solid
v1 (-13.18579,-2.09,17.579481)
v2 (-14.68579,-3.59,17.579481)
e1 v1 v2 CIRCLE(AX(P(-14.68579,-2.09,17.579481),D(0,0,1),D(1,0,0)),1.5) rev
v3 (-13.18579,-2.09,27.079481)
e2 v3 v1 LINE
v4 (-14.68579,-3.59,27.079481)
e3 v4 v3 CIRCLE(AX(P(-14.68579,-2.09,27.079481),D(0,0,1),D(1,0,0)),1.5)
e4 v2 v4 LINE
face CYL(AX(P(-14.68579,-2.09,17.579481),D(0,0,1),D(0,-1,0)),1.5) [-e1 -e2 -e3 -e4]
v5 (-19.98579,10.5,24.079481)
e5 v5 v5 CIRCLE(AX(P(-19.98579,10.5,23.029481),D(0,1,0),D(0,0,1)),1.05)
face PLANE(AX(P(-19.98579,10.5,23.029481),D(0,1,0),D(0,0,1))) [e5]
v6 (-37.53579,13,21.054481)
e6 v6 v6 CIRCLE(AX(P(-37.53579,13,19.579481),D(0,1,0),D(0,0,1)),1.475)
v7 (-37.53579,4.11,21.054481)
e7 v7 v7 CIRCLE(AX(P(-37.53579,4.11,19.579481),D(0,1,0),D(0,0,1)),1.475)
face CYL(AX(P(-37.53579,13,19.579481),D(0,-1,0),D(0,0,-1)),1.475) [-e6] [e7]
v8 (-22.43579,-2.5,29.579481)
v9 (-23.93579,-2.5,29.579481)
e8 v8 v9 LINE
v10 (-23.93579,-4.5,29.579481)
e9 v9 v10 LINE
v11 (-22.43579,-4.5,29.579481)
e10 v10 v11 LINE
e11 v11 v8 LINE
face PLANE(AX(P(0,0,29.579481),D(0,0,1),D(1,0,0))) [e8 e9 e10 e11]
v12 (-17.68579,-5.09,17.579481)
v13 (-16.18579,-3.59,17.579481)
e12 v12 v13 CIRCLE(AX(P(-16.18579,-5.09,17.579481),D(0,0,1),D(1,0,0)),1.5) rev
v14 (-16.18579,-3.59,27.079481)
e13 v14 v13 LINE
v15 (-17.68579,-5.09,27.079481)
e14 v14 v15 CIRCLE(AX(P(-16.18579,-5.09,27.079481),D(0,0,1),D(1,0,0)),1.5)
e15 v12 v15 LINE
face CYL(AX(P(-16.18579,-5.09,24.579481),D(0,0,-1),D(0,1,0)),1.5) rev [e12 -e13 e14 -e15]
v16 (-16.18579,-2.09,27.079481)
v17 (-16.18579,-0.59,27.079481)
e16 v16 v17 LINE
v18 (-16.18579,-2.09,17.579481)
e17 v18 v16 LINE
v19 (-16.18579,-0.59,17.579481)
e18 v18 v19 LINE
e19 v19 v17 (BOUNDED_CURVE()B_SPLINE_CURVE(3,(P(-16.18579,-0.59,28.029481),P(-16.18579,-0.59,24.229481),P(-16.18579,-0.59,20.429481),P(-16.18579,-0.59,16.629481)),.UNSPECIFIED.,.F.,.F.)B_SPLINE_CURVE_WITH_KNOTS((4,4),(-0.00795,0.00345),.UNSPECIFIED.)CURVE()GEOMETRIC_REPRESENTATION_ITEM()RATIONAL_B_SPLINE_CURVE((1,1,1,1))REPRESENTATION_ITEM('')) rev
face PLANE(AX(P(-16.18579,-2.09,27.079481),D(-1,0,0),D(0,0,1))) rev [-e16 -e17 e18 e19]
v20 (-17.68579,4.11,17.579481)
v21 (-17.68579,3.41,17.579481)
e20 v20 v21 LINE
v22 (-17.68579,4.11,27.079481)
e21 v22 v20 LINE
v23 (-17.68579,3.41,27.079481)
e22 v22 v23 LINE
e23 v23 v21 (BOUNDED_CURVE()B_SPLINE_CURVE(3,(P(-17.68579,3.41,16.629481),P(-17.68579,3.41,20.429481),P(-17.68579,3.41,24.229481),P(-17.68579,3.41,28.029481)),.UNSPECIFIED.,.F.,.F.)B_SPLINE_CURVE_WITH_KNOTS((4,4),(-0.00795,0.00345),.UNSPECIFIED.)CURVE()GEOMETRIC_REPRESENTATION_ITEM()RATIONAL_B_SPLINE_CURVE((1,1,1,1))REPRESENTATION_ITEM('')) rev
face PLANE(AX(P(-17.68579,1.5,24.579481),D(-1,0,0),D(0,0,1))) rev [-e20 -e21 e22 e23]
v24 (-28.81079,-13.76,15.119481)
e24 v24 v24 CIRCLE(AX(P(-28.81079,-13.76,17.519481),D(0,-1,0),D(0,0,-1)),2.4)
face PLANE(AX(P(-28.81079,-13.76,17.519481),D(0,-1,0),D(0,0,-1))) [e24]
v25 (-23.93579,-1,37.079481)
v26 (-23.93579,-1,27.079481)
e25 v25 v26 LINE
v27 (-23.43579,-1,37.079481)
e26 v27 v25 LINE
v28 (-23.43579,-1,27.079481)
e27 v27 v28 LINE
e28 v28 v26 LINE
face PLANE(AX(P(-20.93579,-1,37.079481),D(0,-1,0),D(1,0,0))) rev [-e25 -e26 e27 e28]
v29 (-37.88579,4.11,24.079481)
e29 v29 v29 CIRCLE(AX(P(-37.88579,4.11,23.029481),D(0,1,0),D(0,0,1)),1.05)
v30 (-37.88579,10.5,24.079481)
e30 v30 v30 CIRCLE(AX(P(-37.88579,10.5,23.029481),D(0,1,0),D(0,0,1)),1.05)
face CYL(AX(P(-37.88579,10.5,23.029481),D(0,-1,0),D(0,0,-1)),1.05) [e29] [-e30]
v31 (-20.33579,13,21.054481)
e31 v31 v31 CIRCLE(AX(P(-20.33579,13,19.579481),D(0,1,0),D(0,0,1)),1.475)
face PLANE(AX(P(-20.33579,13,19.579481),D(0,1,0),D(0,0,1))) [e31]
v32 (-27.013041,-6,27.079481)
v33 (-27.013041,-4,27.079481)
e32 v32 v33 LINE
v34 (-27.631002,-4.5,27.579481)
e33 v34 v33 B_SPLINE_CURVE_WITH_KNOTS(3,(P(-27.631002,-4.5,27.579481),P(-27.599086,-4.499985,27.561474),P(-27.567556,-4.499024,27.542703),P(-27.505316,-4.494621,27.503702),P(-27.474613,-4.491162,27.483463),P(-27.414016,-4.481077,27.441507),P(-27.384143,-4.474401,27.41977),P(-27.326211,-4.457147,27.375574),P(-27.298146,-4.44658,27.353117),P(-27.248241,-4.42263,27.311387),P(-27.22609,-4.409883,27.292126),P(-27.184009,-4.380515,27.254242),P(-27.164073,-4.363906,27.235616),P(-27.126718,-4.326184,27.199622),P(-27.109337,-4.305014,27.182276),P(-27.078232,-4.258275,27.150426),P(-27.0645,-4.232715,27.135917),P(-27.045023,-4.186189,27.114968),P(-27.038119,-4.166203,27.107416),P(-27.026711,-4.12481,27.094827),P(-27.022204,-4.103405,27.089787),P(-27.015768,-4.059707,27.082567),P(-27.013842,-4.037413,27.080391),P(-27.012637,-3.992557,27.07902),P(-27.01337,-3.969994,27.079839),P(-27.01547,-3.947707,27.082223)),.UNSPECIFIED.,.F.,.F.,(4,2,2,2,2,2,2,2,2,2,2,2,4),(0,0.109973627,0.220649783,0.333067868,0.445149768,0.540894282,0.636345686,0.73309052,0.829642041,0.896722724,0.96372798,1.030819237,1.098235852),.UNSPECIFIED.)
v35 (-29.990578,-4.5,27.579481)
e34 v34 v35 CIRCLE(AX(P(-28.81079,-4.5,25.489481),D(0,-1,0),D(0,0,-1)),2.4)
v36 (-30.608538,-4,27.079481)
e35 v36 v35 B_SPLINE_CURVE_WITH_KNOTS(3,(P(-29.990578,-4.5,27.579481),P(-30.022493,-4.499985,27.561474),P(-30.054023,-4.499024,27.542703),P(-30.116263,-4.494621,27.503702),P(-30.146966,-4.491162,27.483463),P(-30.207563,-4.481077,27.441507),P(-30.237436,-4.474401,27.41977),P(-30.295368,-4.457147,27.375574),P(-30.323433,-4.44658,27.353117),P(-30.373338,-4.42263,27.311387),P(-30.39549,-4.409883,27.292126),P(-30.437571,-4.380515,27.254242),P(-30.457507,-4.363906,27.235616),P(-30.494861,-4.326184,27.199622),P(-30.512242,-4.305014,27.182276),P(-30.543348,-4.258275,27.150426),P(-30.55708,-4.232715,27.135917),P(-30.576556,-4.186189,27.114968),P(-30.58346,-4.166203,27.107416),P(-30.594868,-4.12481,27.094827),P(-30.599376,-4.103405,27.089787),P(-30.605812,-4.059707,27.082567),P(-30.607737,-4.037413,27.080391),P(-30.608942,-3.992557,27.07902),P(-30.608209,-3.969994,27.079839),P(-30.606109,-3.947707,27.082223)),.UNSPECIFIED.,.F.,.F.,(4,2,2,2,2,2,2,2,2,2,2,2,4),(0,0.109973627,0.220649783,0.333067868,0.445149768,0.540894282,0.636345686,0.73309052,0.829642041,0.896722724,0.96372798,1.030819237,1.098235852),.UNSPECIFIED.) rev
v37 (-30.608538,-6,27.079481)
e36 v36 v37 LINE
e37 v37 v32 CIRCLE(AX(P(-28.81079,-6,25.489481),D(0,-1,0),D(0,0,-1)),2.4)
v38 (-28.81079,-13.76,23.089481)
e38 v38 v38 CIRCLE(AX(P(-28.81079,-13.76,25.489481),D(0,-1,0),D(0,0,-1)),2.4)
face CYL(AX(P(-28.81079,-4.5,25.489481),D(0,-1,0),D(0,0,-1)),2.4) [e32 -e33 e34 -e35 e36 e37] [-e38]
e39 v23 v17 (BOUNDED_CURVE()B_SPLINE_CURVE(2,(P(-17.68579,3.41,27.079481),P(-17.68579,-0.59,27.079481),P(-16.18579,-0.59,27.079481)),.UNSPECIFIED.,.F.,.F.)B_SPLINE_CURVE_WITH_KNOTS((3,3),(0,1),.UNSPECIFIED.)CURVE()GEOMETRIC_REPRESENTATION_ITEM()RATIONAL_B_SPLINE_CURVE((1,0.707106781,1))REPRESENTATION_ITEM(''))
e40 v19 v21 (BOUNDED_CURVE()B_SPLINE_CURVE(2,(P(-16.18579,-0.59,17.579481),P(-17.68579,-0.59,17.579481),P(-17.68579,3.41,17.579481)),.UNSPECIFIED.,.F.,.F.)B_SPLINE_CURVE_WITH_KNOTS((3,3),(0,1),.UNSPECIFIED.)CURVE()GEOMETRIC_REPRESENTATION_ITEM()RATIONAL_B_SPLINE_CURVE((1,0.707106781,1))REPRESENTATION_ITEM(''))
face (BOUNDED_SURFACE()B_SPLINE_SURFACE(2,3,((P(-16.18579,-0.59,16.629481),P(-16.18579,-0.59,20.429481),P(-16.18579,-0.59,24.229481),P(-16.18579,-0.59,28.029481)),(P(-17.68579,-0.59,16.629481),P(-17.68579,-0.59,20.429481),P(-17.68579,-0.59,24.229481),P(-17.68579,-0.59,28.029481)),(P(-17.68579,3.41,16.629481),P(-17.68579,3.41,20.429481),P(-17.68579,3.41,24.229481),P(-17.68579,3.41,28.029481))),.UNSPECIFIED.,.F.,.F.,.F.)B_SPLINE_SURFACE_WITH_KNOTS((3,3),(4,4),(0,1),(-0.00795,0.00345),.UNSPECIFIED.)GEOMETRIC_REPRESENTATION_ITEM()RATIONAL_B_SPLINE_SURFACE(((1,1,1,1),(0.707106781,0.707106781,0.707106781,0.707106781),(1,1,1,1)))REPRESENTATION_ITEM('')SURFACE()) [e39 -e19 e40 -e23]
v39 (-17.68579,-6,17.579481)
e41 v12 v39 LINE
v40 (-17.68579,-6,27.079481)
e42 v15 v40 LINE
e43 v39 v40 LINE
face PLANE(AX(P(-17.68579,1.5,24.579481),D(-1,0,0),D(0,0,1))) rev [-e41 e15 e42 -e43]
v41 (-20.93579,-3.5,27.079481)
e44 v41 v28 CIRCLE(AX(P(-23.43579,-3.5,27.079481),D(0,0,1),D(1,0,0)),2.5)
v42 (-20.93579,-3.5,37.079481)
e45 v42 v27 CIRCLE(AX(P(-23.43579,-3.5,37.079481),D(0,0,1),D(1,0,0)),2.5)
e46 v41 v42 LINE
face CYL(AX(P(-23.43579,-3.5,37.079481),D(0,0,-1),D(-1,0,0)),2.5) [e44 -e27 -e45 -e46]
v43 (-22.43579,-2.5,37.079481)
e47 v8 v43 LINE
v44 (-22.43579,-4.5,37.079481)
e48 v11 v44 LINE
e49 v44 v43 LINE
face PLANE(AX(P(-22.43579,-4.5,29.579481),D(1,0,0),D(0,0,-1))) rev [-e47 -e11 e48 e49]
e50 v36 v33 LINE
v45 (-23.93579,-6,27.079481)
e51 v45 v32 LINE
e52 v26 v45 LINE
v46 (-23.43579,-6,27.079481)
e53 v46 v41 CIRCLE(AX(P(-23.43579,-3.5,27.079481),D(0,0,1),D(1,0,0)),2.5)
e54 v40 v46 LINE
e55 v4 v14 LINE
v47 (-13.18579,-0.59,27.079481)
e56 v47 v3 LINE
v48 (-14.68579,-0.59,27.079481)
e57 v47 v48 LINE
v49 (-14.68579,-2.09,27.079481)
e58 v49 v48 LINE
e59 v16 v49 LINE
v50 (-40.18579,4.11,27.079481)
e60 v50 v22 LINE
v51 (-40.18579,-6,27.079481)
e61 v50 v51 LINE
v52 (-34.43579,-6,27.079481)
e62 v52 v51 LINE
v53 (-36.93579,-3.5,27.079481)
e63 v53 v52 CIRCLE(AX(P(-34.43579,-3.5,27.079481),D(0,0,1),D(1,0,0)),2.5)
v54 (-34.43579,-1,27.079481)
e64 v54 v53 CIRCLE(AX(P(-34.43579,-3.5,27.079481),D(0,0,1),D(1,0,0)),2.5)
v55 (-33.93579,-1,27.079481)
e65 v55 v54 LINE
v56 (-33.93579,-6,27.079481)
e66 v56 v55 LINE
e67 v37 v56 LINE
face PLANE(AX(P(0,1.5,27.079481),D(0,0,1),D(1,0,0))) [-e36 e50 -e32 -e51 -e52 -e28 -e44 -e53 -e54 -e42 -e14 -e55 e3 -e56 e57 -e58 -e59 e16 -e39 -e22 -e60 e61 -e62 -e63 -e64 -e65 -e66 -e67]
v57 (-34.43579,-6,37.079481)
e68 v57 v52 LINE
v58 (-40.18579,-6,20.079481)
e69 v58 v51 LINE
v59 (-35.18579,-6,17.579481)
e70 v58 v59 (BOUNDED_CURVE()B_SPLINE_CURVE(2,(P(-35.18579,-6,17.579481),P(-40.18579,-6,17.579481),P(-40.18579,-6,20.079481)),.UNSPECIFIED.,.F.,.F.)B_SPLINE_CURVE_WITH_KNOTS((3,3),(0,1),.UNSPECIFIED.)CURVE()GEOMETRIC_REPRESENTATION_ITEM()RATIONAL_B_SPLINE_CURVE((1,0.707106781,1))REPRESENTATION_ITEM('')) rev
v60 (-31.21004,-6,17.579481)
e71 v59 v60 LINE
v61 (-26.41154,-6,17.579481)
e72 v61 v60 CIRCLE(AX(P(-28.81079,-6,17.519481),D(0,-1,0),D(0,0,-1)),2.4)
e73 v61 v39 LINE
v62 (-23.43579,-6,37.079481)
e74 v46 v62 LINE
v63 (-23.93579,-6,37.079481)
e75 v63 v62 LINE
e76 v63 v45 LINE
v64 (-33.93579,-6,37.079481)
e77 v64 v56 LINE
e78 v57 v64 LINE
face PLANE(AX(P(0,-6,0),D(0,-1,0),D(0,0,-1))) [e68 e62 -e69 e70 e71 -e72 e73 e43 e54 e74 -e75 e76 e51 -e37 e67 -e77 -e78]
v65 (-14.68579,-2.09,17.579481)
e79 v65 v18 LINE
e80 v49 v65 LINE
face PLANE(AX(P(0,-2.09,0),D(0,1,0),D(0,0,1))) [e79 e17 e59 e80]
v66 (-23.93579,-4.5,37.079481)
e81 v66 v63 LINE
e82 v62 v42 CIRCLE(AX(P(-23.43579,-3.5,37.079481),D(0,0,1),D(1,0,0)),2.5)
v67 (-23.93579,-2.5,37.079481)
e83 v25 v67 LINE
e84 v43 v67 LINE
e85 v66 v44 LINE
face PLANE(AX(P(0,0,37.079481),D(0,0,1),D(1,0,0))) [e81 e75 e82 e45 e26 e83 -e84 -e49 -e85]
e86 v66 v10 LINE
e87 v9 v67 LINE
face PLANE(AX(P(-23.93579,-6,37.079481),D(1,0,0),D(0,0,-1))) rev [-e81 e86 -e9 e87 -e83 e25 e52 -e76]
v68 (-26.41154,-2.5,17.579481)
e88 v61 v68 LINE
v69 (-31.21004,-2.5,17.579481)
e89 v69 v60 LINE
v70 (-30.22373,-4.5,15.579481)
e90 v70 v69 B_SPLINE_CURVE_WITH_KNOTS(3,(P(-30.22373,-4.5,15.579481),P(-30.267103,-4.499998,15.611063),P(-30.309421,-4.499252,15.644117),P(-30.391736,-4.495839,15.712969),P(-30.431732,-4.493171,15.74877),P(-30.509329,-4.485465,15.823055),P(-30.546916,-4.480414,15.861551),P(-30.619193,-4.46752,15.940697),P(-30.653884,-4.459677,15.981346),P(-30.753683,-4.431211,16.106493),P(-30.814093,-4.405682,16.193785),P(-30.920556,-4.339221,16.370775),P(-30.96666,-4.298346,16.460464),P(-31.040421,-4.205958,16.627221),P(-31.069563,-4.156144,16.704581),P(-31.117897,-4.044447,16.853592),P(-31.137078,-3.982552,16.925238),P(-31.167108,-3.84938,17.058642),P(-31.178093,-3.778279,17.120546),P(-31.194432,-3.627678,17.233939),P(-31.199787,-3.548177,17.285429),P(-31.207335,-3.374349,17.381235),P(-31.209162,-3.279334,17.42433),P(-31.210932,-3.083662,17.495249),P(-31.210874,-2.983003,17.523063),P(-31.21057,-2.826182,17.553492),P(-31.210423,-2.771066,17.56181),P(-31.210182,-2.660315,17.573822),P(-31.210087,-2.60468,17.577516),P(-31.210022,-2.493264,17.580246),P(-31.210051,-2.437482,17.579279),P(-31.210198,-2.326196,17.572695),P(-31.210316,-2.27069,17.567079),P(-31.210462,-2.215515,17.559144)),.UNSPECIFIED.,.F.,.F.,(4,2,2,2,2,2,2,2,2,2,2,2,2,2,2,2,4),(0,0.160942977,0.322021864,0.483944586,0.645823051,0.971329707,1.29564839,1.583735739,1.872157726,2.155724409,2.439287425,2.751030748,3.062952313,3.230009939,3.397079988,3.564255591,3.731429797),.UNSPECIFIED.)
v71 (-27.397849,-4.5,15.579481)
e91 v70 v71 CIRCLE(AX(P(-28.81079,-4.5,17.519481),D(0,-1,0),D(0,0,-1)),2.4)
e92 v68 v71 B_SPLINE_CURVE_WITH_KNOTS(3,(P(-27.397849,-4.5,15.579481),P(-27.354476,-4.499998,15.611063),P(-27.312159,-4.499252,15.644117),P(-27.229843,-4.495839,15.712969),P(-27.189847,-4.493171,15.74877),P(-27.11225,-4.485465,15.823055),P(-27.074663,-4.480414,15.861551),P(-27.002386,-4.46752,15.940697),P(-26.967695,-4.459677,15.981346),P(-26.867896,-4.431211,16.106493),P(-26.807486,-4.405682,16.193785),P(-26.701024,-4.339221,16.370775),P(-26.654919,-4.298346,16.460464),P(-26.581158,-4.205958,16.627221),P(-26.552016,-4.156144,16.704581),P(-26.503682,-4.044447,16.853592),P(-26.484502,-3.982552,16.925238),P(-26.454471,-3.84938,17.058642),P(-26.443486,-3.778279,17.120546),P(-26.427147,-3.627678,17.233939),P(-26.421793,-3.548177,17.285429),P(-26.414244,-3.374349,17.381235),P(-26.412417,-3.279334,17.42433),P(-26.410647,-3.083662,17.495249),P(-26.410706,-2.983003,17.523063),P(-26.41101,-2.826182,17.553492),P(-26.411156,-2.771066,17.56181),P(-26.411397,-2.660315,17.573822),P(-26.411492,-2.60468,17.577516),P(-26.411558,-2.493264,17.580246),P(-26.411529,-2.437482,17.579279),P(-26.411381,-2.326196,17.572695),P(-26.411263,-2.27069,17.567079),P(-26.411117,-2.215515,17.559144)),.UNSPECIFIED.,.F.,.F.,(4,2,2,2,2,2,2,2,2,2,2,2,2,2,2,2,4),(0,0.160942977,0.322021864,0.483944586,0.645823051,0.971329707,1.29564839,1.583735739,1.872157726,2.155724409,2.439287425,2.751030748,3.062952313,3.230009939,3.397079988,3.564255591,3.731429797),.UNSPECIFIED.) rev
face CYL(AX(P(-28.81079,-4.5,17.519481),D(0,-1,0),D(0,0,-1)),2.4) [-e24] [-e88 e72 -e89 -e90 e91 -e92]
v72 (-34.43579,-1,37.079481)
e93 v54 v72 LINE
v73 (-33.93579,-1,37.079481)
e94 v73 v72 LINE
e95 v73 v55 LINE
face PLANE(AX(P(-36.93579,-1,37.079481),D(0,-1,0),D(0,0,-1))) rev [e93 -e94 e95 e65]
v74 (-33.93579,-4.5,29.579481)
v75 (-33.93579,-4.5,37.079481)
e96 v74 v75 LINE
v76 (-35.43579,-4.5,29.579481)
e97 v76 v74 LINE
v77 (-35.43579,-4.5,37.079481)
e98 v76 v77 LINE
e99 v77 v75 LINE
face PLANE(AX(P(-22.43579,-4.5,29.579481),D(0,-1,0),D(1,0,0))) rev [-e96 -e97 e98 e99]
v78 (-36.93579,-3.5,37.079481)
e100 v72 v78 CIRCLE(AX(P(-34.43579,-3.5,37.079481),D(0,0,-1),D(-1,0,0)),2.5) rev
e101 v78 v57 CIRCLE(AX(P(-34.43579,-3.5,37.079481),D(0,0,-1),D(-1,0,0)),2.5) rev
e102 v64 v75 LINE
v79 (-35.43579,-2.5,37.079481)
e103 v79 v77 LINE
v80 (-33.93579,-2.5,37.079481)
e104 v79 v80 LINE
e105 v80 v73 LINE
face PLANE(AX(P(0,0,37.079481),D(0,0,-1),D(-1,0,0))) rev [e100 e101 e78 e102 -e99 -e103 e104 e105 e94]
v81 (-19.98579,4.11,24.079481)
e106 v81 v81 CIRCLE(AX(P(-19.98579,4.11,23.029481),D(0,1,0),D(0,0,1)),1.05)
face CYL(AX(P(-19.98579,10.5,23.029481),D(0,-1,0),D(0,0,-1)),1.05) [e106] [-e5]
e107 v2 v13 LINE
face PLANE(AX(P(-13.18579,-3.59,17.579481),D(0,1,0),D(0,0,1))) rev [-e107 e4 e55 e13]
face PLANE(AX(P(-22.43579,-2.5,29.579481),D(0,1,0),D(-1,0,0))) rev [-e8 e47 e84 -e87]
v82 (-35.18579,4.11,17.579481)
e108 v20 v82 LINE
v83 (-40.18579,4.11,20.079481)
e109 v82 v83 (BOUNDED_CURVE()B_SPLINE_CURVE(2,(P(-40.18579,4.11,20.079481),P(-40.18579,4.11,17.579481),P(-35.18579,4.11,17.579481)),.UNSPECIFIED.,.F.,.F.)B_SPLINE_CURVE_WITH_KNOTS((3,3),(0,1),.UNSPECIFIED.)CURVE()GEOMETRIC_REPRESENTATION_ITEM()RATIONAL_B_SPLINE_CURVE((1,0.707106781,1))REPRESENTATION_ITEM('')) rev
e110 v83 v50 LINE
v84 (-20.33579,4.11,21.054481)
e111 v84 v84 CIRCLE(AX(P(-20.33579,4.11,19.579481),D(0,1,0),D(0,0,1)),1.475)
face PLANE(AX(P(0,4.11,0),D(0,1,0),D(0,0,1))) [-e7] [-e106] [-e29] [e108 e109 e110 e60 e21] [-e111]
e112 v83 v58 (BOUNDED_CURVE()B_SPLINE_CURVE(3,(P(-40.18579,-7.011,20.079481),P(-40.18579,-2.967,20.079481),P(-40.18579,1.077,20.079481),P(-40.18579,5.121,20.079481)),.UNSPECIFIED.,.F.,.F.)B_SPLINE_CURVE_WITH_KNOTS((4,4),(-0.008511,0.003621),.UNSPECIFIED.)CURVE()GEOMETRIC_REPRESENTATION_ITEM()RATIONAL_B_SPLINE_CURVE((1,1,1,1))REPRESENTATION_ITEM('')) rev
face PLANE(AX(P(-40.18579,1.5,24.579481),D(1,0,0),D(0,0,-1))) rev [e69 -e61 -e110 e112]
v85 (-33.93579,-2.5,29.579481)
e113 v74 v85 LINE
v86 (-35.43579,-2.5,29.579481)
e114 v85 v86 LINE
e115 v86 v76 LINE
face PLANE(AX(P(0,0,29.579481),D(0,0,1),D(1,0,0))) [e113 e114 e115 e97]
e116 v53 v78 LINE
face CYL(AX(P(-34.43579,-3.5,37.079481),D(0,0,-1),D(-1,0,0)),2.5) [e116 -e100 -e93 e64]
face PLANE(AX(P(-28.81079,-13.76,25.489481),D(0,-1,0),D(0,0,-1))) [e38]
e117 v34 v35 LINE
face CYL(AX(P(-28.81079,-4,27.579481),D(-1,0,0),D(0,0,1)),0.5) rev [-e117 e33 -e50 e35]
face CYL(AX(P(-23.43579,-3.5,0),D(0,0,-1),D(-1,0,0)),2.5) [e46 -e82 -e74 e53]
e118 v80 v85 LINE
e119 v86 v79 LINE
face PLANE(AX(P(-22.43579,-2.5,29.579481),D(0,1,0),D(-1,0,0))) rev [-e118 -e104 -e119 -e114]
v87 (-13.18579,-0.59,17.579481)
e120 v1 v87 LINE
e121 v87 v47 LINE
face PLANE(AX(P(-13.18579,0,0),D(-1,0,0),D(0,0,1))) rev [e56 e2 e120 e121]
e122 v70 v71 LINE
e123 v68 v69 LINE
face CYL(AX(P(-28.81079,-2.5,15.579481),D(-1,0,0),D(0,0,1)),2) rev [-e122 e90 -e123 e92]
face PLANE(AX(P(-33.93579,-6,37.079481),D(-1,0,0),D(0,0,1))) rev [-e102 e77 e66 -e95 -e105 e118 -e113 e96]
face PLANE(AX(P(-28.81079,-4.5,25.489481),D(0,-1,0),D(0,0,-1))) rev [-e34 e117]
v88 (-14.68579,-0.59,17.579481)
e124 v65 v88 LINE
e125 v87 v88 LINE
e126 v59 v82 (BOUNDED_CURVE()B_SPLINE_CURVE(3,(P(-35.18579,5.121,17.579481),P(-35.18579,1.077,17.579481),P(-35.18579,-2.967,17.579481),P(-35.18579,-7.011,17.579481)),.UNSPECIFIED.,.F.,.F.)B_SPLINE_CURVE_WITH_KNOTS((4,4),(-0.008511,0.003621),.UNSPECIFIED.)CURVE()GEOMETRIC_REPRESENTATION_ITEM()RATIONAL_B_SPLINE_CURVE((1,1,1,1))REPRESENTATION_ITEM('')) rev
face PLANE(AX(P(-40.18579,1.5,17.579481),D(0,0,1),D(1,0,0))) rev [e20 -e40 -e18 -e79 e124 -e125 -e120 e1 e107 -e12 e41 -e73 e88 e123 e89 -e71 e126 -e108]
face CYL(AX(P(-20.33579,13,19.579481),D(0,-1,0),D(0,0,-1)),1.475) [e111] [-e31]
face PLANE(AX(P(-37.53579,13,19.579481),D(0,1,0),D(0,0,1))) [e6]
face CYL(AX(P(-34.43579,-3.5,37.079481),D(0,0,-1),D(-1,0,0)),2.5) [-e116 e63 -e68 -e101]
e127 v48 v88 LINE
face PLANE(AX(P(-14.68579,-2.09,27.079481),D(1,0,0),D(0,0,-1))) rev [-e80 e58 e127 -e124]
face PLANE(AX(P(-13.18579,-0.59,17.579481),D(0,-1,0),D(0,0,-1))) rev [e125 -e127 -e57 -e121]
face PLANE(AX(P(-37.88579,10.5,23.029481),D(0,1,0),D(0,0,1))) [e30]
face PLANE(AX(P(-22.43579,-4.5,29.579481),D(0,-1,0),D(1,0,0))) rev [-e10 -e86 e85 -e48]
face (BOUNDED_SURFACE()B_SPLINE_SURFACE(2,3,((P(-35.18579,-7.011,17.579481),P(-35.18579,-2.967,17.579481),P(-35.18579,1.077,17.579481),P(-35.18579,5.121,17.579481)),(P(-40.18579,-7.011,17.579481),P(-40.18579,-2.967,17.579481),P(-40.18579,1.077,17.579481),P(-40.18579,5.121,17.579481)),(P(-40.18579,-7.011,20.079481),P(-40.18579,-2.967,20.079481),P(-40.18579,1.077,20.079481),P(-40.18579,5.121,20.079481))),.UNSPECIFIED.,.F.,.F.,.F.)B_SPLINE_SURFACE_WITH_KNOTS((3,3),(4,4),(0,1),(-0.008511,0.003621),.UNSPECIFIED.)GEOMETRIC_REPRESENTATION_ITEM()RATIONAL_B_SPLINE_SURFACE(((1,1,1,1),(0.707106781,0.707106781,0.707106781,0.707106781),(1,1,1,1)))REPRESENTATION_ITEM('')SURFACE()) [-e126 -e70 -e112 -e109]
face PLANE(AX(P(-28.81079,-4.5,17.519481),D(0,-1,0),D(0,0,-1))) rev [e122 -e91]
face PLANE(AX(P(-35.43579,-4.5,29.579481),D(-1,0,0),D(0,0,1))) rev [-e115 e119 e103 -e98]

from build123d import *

# Parameters (mm, degrees)
SKETCH1_W                = 22.5
SKETCH1_H                = 7
BOSS_EXTRUDE1_DEPTH      = 1.5
SKETCH2_R                = 1.475
BOSS_EXTRUDE2_DEPTH      = 11.5
SKETCH3_R                = 1.05
BOSS_EXTRUDE3_DEPTH      = 9
BOSS_EXTRUDE4_DEPTH      = 6
BOSS_EXTRUDE4_DEPTH_BACK = 1.5
SKETCH4_W                = 22.5
SKETCH4_H                = 2.5
SKETCH4_H_2              = 7
SKETCH8_W                = 22.5
SKETCH8_H                = 9.5
BOSS_EXTRUDE7_DEPTH      = 2.61
BOSS_EXTRUDE8_DEPTH      = 7.76
BOSS_EXTRUDE8_DEPTH_BACK = 1.5
SKETCH9_R                = 2.4
SKETCH11_W               = 9.5
SKETCH11_H               = 3
BOSS_EXTRUDE9_DEPTH      = 4.5
SKETCH16_W               = 1.5
SKETCH16_H               = 9.5
CUT_EXTRUDE2_DEPTH       = 1.5
SKETCH19_W               = 3
SKETCH19_H               = 5
BOSS_EXTRUDE10_DEPTH     = 10
SKETCH20_W               = 13
SKETCH20_H               = 2
CUT_EXTRUDE3_DEPTH       = 7.5
FILLET1_SIZE             = 4
FILLET1_SIZE_2           = 1.5
FILLET2_R                = 1.5
FILLET3_R                = 1.5
FILLET4_R                = 2
FILLET5_R                = 0.5
FILLET6_SIZE             = 5
FILLET6_SIZE_2           = 2.5
FILLET7_R                = 2.5
FILLET8_R                = 2.5
FILLET9_R                = 2.5
FILLET10_R               = 2.5


# Some blends are built 0.0001 mm under size
with BuildPart() as part:
    # Sketch1 → Boss-Extrude1 (new body)
    with BuildSketch(Plane(origin=(0, 0, 0), x_dir=(1, 0, 0), z_dir=(0, 1, 0))):
        with Locations((-28.93578967, -21.079480712)):
            Rectangle(SKETCH1_W, SKETCH1_H)
    extrude(amount=BOSS_EXTRUDE1_DEPTH)

    # Sketch2 → Boss-Extrude2 (add)
    with BuildSketch(Plane(origin=(0, 1.5, 0), x_dir=(1, 0, 0), z_dir=(0, 1, 0))):
        with Locations(Location((-37.53578967, -19.579480712, 0), (0, 0, 90))):
            Circle(SKETCH2_R)
        with Locations(Location((-20.33578967, -19.579480712, 0), (0, 0, 90))):
            Circle(SKETCH2_R)
    extrude(amount=BOSS_EXTRUDE2_DEPTH)

    # Sketch3 → Boss-Extrude3 (add)
    with BuildSketch(Plane(origin=(0, 1.5, 0), x_dir=(1, 0, 0), z_dir=(0, 1, 0))):
        with Locations(Location((-37.88578967, -23.029480712, 0), (0, 0, 90))):
            Circle(SKETCH3_R)
        with Locations(Location((-19.98578967, -23.029480712, 0), (0, 0, 90))):
            Circle(SKETCH3_R)
    extrude(amount=BOSS_EXTRUDE3_DEPTH)

    # Sketch4 → Boss-Extrude4 (add, two sides: drawn at the far end of the back side and taken through both)
    with BuildSketch(Plane(origin=(0, 0, 0), x_dir=(-1, 0, 0), z_dir=(0, -1, 0)).offset(-BOSS_EXTRUDE4_DEPTH_BACK)):
        with Locations((28.93578967, -25.829480712)):
            Rectangle(SKETCH4_W, SKETCH4_H)
        with Locations((28.93578967, -21.079480712)):
            Rectangle(SKETCH4_W, SKETCH4_H_2)
    extrude(amount=BOSS_EXTRUDE4_DEPTH + BOSS_EXTRUDE4_DEPTH_BACK)

    # Sketch8 → Boss-Extrude7 (add)
    with BuildSketch(Plane(origin=(0, 1.5, 0), x_dir=(1, 0, 0), z_dir=(0, 1, 0))):
        with Locations((-28.93578967, -22.329480712)):
            Rectangle(SKETCH8_W, SKETCH8_H)
    extrude(amount=BOSS_EXTRUDE7_DEPTH)

    # Sketch9 → Boss-Extrude8 (add, two sides: drawn at the far end of the back side and taken through both)
    with BuildSketch(Plane(origin=(0, -6, 0), x_dir=(-1, 0, 0), z_dir=(0, -1, 0)).offset(-BOSS_EXTRUDE8_DEPTH_BACK)):
        with Locations(Location((28.81078967, -25.489480712, 0), (0, 0, 90))):
            Circle(SKETCH9_R)
        with Locations(Location((28.81078967, -17.519480712, 0), (0, 0, 90))):
            Circle(SKETCH9_R)
    extrude(amount=BOSS_EXTRUDE8_DEPTH + BOSS_EXTRUDE8_DEPTH_BACK)

    # Sketch11 → Boss-Extrude9 (add)
    with BuildSketch(Plane(origin=(-17.68578967, 0, 0), x_dir=(0, 0, -1), z_dir=(1, 0, 0))):
        with Locations((-22.329480712, -2.09)):
            Rectangle(SKETCH11_W, SKETCH11_H)
    extrude(amount=BOSS_EXTRUDE9_DEPTH)

    # Sketch16 → Cut-Extrude2 (cut)
    with BuildSketch(Plane(origin=(0, -0.59, 0), x_dir=(1, 0, 0), z_dir=(0, 1, 0))):
        with Locations((-15.43578967, -22.329480712)):
            Rectangle(SKETCH16_W, SKETCH16_H)
    extrude(amount=-CUT_EXTRUDE2_DEPTH, mode=Mode.SUBTRACT)

    # Sketch19 → Boss-Extrude10 (add)
    with BuildSketch(Plane.XY.offset(27.079480712)):
        with Locations((-22.43578967, -3.5)):
            Rectangle(SKETCH19_W, SKETCH19_H)
        with Locations((-35.43578967, -3.5)):
            Rectangle(SKETCH19_W, SKETCH19_H)
    extrude(amount=BOSS_EXTRUDE10_DEPTH)

    # Sketch20 → Cut-Extrude3 (cut)
    with BuildSketch(Plane.XY.offset(37.079480712)):
        with Locations((-28.93578967, -3.5)):
            Rectangle(SKETCH20_W, SKETCH20_H)
    extrude(amount=-CUT_EXTRUDE3_DEPTH, mode=Mode.SUBTRACT)

    # Fillet1
    # an asymmetric fillet: 4, 1.5 mm, written as the material it adds along each edge
    with BuildSketch(Plane(origin=(-17.68578967, -0.59, 17.579480712), x_dir=(0, 1, 0), z_dir=(0, 0, 1))) as fillet1_piece_1:
        with BuildLine():
            Bezier((FILLET1_SIZE, 0), (0, 0), (0, -FILLET1_SIZE_2), weights=[1, 0.707106781, 1])
            Line((0, -FILLET1_SIZE_2), (0, 0))
            Line((0, 0), (FILLET1_SIZE, 0))
        make_face()
    extrude(amount=9.5)

    # Fillet2
    fillet2_edges = [part.edges().sort_by_distance(p)[0] for p in [
        (-17.68578967, -3.59, 22.329480712),
    ]]
    fillet(fillet2_edges, radius=FILLET2_R)

    # Fillet3
    fillet3_edges = [part.edges().sort_by_distance(p)[0] for p in [
        (-13.18578967, -3.59, 22.329480712),
    ]]
    fillet(fillet3_edges, radius=FILLET3_R)

    # Fillet4
    fillet4_edges = [part.edges().sort_by_distance(p)[0] for p in [
        (-28.81078967, -4.5, 17.579480712),
    ]]
    fillet(fillet4_edges, radius=FILLET4_R)

    # Fillet5
    fillet5_edges = [part.edges().sort_by_distance(p)[0] for p in [
        (-28.81078967, -4.5, 27.079480712),
    ]]
    fillet(fillet5_edges, radius=FILLET5_R)

    # Fillet6
    # an asymmetric fillet: 5, 2.5 mm, written as the material it takes off along each edge
    with BuildSketch(Plane(origin=(-40.18578967, 16.61, 17.579480712), x_dir=(1, 0, 0), z_dir=(0, -1, 0))) as fillet6_piece_1:
        with BuildLine():
            Bezier((FILLET6_SIZE, 0), (0, 0), (0, FILLET6_SIZE_2), weights=[1, 0.707106781, 1])
            Line((0, FILLET6_SIZE_2), (0, 0))
            Line((0, 0), (FILLET6_SIZE, 0))
        make_face()
    extrude(amount=35.11, mode=Mode.SUBTRACT)

    # Fillet7
    fillet7_edges = [part.edges().sort_by_distance(p)[0] for p in [
        (-36.93578967, -6, 32.079480712),
    ]]
    fillet(fillet7_edges, radius=FILLET7_R)

    # Fillet8
    fillet8_edges = [part.edges().sort_by_distance(p)[0] for p in [
        (-36.93578967, -1, 32.079480712),
    ]]
    fillet(fillet8_edges, radius=FILLET8_R - 0.0001)  # a hair under: the kernel refuses the full size

    # Fillet9
    fillet9_edges = [part.edges().sort_by_distance(p)[0] for p in [
        (-20.93578967, -1, 32.079480712),
    ]]
    fillet(fillet9_edges, radius=FILLET9_R)

    # Fillet10
    fillet10_edges = [part.edges().sort_by_distance(p)[0] for p in [
        (-20.93578967, -6, 32.079480712),
    ]]
    fillet(fillet10_edges, radius=FILLET10_R - 0.0001)  # a hair under: the kernel refuses the full size


solid = part.part
